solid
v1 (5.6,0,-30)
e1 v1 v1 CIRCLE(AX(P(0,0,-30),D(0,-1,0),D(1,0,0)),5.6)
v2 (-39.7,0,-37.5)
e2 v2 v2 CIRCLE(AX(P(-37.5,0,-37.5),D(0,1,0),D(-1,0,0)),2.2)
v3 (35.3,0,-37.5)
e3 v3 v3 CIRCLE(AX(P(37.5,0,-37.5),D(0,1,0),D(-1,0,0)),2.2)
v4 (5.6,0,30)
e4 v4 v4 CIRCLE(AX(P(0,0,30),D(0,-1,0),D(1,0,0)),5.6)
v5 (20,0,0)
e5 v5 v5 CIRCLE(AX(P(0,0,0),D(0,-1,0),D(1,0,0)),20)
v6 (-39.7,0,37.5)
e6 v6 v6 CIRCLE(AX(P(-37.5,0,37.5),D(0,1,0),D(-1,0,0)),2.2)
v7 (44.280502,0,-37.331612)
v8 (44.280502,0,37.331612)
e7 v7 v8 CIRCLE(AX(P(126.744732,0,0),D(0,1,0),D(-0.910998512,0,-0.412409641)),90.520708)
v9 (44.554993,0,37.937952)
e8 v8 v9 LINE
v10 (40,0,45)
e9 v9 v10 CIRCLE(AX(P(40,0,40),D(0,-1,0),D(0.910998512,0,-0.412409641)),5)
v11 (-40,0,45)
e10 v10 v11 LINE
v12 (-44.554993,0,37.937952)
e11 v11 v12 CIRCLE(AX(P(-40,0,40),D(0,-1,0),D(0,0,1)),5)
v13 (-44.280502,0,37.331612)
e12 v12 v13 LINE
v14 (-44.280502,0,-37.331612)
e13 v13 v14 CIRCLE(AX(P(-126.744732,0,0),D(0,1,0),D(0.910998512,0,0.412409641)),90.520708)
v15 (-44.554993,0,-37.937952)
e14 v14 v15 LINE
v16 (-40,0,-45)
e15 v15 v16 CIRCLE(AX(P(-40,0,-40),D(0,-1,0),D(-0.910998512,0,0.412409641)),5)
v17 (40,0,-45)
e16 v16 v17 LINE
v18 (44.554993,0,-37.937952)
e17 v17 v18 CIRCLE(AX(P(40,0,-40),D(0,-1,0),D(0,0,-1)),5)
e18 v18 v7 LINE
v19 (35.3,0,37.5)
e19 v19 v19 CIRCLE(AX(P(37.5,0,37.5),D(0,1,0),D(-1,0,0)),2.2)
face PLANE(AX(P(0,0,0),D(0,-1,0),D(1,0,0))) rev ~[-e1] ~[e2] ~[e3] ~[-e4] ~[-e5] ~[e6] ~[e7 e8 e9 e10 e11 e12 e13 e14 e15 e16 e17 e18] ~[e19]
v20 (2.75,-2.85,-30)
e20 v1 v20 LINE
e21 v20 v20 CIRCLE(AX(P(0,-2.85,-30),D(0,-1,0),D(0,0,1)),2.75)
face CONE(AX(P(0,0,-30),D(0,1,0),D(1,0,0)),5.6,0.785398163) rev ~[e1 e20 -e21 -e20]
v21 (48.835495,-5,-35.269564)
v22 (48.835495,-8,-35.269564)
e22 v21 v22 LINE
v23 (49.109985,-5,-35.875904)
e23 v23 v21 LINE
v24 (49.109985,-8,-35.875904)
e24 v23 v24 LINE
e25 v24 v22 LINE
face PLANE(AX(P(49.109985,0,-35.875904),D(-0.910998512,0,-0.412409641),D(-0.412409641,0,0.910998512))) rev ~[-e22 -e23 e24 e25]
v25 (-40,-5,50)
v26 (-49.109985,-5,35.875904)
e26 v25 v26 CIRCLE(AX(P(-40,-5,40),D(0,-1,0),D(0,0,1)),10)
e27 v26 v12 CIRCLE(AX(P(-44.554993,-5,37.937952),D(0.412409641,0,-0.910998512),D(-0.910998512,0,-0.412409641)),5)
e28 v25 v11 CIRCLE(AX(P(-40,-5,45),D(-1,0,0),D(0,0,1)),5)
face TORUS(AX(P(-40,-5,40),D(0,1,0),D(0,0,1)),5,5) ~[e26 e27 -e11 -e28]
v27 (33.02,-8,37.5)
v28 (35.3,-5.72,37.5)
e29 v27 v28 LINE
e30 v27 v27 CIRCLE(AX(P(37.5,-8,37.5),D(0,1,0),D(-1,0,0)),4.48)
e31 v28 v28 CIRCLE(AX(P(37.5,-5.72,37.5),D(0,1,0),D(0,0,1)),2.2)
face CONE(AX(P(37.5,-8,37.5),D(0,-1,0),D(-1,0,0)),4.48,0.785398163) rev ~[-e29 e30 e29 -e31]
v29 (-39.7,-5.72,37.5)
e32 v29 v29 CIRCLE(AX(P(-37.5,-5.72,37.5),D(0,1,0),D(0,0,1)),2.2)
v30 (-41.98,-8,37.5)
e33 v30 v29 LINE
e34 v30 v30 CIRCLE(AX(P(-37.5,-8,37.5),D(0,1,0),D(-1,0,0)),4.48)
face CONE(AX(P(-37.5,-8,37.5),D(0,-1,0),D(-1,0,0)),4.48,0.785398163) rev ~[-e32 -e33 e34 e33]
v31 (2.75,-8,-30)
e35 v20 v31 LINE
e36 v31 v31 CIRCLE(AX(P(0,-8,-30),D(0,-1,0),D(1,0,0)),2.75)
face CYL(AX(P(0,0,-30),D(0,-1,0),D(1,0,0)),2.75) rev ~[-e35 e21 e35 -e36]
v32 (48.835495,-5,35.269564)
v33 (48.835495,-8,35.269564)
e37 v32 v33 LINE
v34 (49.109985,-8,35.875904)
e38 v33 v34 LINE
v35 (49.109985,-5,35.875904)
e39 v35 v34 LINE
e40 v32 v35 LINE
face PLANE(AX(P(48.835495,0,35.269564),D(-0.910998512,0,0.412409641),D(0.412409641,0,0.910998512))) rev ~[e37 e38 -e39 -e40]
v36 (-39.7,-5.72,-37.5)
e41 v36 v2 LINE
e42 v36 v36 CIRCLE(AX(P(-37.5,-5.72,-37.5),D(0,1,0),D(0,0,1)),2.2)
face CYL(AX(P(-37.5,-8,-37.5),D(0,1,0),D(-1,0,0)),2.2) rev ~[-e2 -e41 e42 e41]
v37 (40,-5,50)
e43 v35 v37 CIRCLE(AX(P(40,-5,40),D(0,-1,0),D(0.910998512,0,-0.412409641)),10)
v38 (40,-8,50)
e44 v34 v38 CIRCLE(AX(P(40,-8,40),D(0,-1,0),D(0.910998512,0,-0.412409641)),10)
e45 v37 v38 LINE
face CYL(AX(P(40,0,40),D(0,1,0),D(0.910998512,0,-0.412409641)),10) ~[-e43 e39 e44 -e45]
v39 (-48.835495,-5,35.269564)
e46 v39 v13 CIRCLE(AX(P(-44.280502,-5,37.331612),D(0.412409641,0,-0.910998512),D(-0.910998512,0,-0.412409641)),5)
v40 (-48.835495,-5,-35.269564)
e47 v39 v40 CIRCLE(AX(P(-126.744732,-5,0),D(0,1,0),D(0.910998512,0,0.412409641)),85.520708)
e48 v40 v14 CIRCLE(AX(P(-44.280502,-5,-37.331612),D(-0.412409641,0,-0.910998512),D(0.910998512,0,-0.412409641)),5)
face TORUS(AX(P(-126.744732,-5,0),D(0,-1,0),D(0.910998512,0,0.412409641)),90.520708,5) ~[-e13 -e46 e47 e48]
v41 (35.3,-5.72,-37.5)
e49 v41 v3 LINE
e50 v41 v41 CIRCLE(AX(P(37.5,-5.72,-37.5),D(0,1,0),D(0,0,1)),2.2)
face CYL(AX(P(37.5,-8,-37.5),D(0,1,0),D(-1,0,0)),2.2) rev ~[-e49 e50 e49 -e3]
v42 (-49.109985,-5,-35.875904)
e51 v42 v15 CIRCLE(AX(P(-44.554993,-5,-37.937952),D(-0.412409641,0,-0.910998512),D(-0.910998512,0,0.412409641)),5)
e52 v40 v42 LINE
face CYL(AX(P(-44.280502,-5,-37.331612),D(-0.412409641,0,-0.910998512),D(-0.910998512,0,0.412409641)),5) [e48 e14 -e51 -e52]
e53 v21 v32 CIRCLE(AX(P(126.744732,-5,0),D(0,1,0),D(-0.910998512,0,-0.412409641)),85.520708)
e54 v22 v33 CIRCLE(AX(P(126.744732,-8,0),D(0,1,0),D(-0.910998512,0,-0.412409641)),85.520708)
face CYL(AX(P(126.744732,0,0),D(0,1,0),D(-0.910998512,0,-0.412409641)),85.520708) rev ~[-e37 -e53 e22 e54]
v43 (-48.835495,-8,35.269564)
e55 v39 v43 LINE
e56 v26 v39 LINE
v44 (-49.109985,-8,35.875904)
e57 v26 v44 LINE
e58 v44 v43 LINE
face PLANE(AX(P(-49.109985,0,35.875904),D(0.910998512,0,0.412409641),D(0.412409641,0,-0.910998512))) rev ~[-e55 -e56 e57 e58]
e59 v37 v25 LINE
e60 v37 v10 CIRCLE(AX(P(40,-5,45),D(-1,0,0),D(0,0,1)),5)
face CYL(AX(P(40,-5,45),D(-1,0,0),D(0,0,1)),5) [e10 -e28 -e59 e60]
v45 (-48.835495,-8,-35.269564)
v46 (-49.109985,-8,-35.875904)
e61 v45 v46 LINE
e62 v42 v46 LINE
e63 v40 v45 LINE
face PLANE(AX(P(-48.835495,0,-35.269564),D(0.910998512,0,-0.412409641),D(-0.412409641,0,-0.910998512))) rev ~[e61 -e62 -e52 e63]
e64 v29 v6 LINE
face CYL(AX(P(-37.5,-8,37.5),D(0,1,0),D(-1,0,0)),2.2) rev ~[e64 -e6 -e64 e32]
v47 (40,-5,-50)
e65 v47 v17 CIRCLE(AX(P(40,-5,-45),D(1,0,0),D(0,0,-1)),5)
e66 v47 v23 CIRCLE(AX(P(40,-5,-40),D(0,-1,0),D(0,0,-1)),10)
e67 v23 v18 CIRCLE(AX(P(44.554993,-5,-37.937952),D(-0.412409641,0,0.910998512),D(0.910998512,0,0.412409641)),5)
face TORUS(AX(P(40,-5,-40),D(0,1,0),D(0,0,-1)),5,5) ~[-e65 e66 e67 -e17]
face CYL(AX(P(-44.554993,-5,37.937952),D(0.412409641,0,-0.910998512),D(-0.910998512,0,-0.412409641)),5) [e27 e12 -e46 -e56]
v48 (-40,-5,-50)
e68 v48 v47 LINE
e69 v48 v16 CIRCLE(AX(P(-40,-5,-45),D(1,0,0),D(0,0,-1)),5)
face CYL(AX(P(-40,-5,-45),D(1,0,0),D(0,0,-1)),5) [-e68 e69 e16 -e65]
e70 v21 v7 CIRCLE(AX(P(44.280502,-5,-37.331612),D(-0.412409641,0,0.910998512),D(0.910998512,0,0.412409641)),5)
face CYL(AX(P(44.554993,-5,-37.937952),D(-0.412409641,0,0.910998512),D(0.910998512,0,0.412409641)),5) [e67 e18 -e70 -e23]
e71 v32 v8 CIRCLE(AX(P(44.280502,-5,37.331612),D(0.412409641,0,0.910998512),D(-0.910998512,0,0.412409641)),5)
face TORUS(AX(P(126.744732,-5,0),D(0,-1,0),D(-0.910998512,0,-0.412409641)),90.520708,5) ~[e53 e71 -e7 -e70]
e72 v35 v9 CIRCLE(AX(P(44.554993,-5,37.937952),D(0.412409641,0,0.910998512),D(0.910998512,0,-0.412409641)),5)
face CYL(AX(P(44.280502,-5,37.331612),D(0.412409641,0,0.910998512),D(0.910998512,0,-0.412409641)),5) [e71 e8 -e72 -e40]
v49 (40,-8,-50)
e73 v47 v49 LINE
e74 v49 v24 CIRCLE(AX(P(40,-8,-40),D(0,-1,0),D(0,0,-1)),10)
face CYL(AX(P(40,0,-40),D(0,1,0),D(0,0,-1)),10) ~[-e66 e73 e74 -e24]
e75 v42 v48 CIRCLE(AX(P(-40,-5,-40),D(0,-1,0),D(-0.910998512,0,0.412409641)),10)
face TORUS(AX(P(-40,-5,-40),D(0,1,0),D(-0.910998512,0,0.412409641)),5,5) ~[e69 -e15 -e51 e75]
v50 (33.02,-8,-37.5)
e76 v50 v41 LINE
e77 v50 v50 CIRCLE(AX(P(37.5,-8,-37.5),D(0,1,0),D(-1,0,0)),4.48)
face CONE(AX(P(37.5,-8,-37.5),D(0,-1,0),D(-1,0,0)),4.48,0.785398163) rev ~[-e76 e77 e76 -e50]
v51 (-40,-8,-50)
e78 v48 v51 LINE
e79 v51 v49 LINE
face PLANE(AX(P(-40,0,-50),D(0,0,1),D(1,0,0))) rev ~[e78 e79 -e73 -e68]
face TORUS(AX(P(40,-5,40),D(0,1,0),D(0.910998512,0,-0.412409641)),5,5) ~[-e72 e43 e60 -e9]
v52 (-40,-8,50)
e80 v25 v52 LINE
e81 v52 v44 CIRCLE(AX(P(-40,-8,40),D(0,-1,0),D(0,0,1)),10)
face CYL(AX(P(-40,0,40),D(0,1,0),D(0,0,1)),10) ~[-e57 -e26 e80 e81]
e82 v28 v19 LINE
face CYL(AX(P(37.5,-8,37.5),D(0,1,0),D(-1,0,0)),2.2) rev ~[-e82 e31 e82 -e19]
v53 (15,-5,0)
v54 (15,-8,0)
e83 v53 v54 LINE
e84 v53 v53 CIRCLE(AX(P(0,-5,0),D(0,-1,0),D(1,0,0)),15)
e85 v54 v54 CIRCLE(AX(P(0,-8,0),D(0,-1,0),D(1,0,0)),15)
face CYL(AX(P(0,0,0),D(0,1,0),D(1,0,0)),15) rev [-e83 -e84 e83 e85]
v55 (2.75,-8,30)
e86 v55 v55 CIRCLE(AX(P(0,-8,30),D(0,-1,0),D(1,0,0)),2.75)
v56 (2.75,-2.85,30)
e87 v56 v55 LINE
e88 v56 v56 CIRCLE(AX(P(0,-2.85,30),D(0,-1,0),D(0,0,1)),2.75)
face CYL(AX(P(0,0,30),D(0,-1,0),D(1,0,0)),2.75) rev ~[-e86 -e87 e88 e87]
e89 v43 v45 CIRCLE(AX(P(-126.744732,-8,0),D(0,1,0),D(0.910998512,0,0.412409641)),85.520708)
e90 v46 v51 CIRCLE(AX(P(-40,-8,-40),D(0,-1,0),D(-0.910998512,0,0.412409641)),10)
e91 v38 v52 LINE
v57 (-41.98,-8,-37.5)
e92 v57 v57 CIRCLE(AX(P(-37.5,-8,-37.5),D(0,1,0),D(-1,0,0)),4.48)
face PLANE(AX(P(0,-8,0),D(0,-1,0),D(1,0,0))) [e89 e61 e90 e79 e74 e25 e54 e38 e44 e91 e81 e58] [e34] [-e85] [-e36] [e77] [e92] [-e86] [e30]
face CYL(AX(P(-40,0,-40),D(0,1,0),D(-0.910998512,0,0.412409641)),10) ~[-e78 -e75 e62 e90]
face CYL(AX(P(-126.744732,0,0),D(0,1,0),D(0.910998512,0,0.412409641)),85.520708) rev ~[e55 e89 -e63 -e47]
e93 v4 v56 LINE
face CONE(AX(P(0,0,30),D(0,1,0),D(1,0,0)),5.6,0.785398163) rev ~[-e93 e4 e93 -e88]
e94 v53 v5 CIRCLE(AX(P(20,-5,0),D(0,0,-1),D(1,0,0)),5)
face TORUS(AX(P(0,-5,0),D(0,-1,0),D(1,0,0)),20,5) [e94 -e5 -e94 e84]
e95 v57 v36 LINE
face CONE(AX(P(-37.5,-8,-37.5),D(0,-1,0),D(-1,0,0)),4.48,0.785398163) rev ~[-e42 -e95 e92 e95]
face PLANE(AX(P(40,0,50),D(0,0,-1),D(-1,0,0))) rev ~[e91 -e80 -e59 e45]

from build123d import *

# Parameters (mm, degrees)
F0_R           = 15
F1_DEPTH       = 8
F3_D           = 4.4
F3_START       = 2
F3_CSINK_D     = 8.96
F3_CSINK_ANGLE = 90
F5_D           = 5.5
F5_CSINK_D     = 11.2
F5_CSINK_ANGLE = 90
F6_R           = 5


# Not quite as in the source:
# - a feature names something its author has since deleted; it is built from what else it names


with BuildPart() as f1:
    # F0 (on Front) → F1 (new body)
    with BuildSketch(Plane.XZ):
        with BuildLine():
            Line((40, 50), (-40, 50))
            ThreePointArc((-40, 50), (-48.4035993498, 45.4202876277), (-49.1099851169, 35.8759035935))
            Line((-49.1099851169, 35.8759035935), (-48.8354949074, 35.2695642948))
            ThreePointArc((-48.8354949074, 35.2695642948), (-41.2240246484, 0), (-48.8354949074, -35.2695642948))
            Line((-48.8354949074, -35.2695642948), (-49.1099851169, -35.8759035935))
            ThreePointArc((-49.1099851169, -35.8759035935), (-48.4035993498, -45.4202876277), (-40, -50))
            Line((-40, -50), (40, -50))
            ThreePointArc((40, -50), (48.4035993498, -45.4202876277), (49.1099851169, -35.8759035935))
            Line((49.1099851169, -35.8759035935), (48.8354949074, -35.2695642948))
            ThreePointArc((48.8354949074, -35.2695642948), (41.2240246484, 0), (48.8354949074, 35.2695642948))
            Line((48.8354949074, 35.2695642948), (49.1099851169, 35.8759035935))
            ThreePointArc((49.1099851169, 35.8759035935), (48.4035993498, 45.4202876277), (40, 50))
        make_face()
        Circle(F0_R, mode=Mode.SUBTRACT)
    extrude(amount=F1_DEPTH)

    # F3 (through all)
    # its depths count from where the whole tool has entered the part; down to there all is cleared
    with Locations(Plane.XZ.offset(10).offset(-F3_START)):
        with Locations((-37.5, 37.5), (37.5, 37.5), (37.5, -37.5), (-37.5, -37.5)):
            CounterSinkHole(F3_D / 2, F3_CSINK_D / 2, counter_sink_angle=F3_CSINK_ANGLE)

    # F5 (through all)
    with Locations(Plane(origin=(0, 0, 0), x_dir=(-1, 0, 0), z_dir=(0, 1, 0))):
        with Locations((0, -30), (0, 30)):
            CounterSinkHole(F5_D / 2, F5_CSINK_D / 2, counter_sink_angle=F5_CSINK_ANGLE)

    # F6
    f6_edges = [f1.edges().sort_by_distance(p)[0] for p in [
        (0, 0, 50),
        (-15, 0, 0),
    ]]
    fillet(f6_edges, radius=F6_R)


solid = f1.part
